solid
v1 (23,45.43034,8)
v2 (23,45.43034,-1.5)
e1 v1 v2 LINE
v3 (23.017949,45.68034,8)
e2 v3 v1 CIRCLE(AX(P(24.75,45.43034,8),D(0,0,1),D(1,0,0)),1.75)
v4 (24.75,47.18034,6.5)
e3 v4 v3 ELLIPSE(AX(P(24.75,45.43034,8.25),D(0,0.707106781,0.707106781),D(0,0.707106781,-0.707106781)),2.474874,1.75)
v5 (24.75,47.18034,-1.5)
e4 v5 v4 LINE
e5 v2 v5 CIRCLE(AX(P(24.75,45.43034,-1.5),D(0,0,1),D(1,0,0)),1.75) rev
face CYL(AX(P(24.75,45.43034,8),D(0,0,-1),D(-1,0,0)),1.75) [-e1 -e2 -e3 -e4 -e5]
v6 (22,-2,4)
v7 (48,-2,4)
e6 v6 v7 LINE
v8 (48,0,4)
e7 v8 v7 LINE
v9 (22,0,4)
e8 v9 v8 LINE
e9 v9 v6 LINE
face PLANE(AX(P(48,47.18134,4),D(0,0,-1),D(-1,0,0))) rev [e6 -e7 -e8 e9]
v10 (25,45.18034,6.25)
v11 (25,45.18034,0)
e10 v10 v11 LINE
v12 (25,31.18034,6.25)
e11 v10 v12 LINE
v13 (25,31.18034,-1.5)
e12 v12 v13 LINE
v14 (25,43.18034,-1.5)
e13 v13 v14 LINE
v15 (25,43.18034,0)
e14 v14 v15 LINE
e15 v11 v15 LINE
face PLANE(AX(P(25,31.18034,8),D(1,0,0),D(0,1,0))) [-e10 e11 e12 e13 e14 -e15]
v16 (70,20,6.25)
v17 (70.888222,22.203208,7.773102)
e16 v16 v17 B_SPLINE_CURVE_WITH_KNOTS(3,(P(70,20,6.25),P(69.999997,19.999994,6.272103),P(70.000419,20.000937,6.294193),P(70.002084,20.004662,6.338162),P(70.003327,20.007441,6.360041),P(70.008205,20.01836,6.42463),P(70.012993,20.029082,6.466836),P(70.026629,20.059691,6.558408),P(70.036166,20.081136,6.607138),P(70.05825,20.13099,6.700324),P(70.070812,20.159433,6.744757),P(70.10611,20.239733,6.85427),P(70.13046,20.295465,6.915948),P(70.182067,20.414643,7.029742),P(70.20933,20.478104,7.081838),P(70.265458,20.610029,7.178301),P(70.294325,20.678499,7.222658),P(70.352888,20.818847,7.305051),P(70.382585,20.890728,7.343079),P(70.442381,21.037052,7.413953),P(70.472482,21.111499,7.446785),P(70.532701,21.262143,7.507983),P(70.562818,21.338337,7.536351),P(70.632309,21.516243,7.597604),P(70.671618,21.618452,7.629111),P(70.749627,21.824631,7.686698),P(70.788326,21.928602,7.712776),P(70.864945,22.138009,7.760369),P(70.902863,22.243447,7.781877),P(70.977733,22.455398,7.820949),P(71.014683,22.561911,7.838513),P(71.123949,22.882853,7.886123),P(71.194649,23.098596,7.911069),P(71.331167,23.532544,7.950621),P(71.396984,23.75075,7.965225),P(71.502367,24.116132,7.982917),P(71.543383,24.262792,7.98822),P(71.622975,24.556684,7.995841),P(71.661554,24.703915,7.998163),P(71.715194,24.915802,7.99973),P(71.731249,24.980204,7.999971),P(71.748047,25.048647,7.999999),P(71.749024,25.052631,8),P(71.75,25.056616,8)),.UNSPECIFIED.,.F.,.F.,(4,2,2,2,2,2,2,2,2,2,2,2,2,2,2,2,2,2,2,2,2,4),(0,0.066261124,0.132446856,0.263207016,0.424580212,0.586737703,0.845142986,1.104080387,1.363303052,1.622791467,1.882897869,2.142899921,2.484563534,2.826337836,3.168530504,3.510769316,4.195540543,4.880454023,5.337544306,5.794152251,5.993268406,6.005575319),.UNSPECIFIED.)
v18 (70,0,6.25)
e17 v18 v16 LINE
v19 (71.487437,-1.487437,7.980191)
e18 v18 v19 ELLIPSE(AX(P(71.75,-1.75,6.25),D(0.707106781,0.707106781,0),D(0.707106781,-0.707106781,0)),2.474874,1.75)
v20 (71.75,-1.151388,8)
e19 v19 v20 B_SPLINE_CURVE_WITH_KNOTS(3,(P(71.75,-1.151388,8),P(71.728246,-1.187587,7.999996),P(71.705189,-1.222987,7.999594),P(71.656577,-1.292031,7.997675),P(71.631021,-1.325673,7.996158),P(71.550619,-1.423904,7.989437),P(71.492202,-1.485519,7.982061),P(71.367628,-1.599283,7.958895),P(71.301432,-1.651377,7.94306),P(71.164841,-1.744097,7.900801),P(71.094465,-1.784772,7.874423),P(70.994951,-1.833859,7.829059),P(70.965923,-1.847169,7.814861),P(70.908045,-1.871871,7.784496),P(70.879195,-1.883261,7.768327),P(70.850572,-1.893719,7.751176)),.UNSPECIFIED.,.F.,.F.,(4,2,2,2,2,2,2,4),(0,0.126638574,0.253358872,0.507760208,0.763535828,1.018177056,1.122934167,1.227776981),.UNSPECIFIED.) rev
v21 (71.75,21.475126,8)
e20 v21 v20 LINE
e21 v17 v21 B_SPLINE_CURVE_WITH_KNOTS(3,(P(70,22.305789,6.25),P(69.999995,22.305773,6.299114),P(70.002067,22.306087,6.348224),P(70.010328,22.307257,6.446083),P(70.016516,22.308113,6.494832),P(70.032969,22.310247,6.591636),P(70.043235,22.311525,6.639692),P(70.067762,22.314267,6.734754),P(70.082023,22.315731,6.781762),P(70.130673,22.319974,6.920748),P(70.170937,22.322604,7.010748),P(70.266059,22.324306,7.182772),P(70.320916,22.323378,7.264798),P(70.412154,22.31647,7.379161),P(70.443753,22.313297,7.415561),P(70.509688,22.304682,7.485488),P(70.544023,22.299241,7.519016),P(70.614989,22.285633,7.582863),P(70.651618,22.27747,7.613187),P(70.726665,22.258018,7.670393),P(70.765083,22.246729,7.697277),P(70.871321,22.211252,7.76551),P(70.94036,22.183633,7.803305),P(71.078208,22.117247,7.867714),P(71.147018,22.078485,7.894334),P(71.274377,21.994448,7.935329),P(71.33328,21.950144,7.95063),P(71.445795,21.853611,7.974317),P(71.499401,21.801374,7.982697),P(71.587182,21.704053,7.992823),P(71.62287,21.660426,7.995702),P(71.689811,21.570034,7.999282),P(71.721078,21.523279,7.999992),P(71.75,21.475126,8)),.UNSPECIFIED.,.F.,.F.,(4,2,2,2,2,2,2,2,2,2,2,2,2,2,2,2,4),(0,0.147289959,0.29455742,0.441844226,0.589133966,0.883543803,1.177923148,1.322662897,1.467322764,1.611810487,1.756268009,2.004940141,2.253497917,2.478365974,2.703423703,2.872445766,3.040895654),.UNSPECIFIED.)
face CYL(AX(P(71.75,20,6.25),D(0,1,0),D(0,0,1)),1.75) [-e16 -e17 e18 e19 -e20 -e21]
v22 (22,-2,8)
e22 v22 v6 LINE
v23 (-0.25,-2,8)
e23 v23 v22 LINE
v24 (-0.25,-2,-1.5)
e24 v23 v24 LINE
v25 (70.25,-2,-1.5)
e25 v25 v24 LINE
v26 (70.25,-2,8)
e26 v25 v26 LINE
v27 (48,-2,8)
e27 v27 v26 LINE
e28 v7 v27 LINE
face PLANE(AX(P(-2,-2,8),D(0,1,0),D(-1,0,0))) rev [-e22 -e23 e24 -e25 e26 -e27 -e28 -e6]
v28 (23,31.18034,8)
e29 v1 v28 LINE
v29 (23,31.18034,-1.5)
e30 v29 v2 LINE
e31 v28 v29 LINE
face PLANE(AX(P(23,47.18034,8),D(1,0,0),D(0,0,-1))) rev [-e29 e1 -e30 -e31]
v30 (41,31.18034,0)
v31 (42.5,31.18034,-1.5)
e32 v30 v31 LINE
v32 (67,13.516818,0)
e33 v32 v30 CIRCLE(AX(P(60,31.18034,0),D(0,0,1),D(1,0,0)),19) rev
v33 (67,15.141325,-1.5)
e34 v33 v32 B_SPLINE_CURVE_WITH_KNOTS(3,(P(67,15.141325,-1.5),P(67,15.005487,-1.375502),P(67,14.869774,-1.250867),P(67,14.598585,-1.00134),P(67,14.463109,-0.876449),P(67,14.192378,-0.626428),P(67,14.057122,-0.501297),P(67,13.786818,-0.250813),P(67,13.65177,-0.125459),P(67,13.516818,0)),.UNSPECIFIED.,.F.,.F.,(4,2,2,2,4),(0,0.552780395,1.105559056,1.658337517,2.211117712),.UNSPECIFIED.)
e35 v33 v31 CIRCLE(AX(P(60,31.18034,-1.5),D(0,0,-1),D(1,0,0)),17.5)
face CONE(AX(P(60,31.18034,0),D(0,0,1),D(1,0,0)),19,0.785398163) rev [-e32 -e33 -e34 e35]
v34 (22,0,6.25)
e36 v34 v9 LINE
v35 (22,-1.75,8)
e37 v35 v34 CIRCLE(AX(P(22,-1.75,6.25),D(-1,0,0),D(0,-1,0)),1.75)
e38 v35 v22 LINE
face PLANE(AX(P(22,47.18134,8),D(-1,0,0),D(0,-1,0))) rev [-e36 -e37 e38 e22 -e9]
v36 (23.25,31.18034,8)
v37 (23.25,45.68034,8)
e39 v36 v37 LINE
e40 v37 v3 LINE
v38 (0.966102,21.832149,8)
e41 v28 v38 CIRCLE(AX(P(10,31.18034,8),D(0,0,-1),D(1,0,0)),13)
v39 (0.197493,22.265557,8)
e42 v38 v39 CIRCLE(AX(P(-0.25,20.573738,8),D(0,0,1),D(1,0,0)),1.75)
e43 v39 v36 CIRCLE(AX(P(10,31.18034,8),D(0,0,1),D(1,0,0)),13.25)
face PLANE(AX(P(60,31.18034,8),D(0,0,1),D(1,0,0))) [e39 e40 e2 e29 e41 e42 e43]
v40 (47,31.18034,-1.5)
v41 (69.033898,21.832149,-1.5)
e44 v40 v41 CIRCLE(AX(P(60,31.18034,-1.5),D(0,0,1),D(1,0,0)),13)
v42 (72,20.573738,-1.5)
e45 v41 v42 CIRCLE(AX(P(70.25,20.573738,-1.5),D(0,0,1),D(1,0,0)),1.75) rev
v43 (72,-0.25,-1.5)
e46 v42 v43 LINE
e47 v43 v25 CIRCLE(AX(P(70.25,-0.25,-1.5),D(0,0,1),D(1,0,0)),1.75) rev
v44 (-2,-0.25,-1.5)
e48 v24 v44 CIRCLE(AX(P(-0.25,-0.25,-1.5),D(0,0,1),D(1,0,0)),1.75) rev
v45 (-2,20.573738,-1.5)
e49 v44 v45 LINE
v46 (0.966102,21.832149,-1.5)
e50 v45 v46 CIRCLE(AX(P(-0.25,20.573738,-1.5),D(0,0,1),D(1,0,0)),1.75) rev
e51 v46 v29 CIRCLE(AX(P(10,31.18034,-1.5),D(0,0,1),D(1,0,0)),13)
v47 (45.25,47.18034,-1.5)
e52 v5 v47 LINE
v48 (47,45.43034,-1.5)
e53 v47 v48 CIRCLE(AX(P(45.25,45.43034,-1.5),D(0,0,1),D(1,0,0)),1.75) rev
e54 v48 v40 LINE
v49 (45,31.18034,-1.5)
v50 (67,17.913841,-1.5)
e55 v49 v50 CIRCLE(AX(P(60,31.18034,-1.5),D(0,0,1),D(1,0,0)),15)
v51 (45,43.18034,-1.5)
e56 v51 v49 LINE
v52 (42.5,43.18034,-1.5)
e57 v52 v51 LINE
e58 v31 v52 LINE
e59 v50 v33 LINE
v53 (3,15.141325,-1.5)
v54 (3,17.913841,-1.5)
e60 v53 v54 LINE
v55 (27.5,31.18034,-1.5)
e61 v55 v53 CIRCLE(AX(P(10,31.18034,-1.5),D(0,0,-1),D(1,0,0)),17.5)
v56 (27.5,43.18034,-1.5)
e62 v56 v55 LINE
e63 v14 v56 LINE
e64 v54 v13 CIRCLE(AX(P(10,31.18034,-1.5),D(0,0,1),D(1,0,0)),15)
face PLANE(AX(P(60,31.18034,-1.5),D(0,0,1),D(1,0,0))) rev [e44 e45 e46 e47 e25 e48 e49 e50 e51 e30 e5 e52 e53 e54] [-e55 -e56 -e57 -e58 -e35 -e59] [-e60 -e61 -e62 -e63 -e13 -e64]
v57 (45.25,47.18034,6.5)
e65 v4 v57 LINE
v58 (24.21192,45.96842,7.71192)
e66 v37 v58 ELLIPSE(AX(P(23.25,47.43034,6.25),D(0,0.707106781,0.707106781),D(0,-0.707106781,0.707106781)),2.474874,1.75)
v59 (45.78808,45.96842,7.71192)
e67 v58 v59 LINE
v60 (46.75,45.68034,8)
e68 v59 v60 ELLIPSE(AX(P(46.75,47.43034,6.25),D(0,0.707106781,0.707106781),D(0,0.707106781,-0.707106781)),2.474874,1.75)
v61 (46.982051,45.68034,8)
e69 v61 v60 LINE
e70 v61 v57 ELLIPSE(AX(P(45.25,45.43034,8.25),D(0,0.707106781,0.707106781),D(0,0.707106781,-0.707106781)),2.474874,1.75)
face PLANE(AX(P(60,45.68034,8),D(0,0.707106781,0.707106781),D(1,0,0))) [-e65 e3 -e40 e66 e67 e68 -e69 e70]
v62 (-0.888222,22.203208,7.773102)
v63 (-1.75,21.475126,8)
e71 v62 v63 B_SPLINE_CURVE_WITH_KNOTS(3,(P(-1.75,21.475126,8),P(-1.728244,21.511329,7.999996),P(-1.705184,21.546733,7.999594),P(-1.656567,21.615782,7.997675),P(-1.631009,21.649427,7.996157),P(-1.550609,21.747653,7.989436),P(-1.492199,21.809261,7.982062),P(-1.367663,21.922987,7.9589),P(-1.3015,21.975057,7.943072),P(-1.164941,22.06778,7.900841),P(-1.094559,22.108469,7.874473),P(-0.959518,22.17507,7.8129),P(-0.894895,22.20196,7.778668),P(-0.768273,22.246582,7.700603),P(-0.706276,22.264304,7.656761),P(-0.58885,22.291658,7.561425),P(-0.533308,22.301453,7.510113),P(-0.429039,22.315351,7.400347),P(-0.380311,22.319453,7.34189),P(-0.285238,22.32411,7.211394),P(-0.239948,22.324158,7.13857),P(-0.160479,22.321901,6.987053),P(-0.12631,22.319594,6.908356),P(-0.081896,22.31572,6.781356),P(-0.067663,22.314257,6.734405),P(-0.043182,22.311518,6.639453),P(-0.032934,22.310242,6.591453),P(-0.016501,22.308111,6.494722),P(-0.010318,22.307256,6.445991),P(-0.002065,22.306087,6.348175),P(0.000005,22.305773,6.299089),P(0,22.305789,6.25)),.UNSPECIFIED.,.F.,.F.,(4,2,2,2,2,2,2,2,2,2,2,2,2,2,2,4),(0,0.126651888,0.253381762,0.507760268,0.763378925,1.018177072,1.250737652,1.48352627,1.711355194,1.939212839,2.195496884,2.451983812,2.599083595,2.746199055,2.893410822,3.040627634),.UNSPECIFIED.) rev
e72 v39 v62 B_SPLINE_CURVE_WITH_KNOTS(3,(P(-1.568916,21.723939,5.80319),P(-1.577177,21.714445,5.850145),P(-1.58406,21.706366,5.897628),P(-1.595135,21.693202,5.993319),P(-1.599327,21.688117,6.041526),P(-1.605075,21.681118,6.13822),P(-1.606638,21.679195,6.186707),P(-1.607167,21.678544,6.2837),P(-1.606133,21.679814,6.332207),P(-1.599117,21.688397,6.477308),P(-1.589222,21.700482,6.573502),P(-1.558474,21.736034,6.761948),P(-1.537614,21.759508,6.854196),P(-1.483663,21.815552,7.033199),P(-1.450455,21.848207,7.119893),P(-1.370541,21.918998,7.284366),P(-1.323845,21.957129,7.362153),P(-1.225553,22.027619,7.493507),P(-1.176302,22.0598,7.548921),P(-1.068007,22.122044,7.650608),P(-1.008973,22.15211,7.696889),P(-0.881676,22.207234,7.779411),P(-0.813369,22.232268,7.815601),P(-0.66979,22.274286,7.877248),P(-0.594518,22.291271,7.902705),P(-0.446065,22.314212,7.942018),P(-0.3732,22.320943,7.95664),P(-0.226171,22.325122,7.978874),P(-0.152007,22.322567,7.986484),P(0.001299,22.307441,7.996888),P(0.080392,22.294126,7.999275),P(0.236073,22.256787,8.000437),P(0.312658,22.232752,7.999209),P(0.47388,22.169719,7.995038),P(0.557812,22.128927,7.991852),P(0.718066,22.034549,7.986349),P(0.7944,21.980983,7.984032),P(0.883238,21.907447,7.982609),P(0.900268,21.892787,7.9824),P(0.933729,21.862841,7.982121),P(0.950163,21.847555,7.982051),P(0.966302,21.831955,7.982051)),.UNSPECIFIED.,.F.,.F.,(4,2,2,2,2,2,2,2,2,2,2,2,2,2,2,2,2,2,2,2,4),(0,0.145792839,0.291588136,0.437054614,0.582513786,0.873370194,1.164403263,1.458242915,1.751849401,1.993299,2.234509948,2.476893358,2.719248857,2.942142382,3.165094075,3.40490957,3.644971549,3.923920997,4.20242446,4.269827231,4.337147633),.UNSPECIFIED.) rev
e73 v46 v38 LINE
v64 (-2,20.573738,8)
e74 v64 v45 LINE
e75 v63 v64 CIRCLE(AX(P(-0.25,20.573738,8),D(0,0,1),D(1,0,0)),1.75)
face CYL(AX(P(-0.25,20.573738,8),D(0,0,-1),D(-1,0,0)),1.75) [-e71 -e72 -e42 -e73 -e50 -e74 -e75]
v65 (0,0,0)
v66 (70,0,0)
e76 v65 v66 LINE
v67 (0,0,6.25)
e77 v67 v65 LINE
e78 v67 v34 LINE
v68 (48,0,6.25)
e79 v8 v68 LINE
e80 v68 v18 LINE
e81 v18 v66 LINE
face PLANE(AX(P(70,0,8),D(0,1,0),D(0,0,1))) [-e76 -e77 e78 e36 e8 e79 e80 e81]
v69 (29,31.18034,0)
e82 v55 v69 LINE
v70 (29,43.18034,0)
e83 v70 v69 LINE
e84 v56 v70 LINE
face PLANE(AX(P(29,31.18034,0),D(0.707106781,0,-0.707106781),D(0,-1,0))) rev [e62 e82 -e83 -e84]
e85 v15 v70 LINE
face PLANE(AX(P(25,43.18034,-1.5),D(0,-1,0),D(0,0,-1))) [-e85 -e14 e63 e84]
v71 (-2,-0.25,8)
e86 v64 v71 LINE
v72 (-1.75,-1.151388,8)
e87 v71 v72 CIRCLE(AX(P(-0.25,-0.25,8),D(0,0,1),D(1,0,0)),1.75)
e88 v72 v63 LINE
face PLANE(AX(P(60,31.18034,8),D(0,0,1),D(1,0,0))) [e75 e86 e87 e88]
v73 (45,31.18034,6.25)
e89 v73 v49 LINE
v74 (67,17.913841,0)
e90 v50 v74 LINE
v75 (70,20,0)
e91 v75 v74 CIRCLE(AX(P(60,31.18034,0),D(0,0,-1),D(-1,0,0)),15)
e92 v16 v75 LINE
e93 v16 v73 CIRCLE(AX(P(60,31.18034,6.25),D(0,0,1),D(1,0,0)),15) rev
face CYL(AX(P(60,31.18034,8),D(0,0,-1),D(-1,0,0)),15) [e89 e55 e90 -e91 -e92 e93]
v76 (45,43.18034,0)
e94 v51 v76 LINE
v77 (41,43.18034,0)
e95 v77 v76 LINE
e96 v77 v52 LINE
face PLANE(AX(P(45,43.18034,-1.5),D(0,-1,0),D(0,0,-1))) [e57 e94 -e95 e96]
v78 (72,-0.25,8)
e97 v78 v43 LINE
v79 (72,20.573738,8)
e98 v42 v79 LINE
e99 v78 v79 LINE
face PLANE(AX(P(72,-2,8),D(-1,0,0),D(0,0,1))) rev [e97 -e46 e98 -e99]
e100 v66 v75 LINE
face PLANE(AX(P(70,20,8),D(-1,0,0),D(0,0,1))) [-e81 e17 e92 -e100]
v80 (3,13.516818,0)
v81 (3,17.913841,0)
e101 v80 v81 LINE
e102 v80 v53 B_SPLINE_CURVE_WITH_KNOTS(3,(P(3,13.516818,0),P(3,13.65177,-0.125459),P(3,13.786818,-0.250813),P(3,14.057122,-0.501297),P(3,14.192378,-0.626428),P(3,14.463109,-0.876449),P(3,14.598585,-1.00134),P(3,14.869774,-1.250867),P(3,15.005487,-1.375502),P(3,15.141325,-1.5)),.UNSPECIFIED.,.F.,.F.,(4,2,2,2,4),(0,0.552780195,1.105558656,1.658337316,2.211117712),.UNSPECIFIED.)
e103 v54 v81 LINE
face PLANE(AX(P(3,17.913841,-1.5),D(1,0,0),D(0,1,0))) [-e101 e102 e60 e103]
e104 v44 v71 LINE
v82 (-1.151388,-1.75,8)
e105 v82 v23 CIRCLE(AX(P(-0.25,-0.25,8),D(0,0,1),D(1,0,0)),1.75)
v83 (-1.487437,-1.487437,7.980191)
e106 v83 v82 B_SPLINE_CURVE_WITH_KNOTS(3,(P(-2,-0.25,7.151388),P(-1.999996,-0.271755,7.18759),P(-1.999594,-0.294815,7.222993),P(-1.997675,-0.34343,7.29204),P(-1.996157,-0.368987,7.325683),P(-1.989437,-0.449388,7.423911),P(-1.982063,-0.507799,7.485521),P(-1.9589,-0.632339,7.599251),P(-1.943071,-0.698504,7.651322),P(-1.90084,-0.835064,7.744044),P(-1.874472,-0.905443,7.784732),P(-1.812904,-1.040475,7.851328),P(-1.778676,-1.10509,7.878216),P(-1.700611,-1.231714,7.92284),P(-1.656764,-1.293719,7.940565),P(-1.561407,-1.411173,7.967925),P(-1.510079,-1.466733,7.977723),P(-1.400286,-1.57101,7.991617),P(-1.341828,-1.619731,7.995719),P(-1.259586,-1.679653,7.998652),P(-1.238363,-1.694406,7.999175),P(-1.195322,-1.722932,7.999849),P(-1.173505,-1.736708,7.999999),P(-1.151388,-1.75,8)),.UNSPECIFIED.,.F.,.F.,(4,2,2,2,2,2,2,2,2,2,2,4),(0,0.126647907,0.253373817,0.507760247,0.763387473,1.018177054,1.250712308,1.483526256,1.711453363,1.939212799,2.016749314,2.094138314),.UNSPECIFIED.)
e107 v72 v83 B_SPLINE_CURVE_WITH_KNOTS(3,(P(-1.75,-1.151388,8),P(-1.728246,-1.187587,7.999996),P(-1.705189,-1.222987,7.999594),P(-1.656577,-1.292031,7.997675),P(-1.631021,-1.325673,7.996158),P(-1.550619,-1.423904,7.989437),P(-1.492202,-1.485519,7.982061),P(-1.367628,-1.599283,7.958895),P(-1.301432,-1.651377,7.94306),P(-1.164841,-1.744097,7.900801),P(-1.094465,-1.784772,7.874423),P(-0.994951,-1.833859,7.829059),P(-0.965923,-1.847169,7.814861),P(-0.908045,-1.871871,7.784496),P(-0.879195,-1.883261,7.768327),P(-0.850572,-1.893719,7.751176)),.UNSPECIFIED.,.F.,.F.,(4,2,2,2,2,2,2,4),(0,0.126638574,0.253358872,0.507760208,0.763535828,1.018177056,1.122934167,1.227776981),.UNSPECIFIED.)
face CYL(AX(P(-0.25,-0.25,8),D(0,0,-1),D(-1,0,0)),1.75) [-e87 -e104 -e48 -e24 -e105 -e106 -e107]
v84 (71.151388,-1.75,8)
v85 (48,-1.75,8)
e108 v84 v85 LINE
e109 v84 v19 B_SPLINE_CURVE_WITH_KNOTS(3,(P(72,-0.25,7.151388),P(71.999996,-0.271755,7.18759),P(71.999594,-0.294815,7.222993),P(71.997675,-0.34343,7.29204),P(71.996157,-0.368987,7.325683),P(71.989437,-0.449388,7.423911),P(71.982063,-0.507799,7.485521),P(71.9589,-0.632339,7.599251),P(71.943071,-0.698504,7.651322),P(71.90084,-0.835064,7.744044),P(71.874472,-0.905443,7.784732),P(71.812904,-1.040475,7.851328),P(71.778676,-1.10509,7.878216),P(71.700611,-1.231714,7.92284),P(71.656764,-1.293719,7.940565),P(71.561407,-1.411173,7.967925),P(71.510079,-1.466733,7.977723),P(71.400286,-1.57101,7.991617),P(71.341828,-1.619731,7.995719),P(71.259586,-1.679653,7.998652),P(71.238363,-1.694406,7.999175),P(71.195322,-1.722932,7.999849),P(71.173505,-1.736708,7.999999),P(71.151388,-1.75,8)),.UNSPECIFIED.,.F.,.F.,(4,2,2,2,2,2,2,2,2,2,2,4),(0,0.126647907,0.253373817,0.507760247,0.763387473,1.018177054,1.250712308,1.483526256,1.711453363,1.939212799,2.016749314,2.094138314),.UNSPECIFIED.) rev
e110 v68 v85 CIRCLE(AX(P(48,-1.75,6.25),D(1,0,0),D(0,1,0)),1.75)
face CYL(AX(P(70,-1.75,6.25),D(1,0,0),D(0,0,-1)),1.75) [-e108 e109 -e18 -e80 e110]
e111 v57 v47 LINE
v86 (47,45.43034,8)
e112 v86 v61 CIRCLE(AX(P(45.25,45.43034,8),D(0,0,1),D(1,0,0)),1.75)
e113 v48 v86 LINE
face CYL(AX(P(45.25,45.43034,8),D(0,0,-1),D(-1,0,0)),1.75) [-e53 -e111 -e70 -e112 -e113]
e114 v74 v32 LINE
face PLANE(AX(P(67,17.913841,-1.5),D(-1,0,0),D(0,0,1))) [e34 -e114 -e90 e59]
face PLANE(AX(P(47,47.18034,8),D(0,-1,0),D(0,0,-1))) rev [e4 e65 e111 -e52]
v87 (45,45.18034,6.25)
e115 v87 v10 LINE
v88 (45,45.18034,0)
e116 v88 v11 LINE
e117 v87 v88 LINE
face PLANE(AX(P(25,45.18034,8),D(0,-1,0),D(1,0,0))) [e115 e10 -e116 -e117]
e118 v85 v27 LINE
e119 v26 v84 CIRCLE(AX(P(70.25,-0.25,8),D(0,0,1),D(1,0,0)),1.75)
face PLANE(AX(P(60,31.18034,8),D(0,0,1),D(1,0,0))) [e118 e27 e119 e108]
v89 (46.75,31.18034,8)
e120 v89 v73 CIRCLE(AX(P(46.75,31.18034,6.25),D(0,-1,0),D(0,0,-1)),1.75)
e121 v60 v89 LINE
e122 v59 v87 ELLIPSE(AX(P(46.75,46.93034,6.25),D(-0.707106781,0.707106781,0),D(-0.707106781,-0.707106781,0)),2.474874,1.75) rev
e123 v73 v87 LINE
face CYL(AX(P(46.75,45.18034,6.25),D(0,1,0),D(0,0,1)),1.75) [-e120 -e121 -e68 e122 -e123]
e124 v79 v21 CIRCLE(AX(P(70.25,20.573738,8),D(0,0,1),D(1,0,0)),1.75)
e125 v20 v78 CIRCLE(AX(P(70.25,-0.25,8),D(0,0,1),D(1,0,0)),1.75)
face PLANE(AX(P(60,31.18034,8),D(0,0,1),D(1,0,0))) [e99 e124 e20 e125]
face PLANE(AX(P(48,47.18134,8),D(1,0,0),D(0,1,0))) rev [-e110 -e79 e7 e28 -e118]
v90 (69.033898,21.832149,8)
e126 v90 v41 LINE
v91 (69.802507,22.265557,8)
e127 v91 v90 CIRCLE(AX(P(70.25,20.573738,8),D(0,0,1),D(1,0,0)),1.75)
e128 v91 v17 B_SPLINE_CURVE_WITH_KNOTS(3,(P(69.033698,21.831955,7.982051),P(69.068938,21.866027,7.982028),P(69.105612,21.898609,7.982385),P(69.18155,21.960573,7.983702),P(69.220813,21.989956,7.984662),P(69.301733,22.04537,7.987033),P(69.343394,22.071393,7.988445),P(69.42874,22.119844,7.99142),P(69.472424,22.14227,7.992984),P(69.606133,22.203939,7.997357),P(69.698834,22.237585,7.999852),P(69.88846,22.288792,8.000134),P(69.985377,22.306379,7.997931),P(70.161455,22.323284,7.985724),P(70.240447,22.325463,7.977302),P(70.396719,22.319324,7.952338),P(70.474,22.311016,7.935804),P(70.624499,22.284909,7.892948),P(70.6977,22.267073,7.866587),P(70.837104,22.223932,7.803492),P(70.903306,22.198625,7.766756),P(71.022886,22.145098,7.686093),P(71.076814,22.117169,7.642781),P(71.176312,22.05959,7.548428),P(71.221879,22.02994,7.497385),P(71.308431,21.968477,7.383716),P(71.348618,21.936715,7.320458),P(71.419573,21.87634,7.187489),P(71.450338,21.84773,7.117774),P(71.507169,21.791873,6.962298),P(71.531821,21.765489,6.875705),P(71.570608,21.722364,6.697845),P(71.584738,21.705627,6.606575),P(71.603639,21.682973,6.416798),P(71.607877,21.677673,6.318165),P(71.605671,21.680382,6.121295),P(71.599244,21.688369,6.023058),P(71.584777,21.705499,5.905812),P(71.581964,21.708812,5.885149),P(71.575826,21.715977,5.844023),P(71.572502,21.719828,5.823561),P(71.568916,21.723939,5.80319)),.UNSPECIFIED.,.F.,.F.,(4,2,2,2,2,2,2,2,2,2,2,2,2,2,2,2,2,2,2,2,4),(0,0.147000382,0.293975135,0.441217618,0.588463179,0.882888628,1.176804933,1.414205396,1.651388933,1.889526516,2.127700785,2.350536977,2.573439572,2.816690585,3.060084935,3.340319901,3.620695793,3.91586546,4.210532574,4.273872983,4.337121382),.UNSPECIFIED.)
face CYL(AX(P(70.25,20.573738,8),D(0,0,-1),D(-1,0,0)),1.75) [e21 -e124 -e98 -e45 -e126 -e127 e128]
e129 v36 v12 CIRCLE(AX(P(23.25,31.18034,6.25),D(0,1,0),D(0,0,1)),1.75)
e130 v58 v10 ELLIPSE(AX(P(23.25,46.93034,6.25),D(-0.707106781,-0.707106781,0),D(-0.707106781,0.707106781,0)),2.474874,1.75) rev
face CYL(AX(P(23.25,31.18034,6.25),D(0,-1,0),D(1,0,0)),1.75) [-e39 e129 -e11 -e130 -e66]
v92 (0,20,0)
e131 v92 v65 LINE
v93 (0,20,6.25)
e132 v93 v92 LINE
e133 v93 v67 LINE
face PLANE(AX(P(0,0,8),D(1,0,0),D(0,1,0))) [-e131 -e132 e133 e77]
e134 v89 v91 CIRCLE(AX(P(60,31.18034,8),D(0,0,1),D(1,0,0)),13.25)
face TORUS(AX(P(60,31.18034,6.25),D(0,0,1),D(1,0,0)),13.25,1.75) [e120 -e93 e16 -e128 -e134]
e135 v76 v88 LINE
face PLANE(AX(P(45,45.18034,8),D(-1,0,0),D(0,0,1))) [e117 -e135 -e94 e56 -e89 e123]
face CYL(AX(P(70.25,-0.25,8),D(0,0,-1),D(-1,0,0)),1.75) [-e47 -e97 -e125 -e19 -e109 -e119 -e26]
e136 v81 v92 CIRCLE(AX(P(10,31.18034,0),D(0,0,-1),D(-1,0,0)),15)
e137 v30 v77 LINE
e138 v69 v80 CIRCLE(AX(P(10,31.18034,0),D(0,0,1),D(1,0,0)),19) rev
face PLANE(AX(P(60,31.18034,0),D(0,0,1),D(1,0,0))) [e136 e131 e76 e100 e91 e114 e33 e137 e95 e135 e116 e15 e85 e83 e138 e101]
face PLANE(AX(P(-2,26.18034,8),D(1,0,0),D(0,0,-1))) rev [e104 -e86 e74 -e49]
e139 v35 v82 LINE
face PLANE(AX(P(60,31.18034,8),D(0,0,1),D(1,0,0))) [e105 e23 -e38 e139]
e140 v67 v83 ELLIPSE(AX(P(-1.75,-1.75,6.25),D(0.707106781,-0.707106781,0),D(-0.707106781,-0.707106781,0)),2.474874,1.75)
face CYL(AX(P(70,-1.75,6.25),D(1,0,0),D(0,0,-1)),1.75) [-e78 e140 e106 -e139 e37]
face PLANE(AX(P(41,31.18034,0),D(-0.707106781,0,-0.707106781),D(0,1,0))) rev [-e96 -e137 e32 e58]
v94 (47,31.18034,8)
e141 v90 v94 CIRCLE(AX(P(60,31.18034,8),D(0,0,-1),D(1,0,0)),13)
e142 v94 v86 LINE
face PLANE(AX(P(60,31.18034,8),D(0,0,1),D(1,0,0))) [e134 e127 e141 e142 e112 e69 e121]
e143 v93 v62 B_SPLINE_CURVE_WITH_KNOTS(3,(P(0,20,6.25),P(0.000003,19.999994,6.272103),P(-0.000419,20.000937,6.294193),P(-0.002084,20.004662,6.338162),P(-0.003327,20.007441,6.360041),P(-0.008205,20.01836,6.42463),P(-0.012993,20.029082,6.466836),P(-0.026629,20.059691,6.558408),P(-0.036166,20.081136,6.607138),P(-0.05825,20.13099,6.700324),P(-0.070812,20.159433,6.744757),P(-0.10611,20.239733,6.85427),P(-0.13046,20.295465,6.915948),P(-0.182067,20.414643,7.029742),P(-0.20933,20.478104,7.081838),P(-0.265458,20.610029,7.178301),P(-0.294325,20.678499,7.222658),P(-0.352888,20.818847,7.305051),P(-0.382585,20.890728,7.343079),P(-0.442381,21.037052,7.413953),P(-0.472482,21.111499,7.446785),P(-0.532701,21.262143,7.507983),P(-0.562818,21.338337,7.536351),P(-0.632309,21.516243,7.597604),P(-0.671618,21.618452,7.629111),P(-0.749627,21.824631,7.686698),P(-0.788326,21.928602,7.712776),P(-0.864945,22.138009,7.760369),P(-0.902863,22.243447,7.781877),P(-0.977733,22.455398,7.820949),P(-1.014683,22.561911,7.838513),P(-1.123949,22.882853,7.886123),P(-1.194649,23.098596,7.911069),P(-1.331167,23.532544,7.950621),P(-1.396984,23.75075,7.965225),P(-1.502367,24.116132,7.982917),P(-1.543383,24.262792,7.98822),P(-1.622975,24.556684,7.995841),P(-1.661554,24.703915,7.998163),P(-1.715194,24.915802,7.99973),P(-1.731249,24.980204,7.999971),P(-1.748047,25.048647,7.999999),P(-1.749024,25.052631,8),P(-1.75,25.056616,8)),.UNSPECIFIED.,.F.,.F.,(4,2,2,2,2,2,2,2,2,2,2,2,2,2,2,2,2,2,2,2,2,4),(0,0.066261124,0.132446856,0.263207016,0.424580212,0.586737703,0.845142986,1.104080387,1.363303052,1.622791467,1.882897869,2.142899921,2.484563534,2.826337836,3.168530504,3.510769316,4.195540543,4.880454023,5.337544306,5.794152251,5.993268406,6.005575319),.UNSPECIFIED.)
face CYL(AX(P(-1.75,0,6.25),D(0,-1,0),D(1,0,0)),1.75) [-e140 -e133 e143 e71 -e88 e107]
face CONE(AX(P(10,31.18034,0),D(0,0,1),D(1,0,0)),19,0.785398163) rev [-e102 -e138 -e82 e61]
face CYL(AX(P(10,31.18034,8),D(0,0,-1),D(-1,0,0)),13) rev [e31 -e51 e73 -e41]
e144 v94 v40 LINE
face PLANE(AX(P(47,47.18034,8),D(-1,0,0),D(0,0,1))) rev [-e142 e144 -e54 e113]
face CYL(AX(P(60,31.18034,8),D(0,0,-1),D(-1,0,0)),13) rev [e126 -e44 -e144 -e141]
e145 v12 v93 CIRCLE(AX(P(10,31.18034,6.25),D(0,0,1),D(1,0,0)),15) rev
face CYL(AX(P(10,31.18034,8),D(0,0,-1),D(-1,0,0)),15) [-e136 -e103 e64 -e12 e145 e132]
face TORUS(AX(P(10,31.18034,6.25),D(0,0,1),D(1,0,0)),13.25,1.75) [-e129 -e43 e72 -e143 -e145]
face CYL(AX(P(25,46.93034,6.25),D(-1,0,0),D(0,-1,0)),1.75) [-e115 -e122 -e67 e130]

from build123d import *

# Parameters (mm, degrees)
BOSS_EXTRUDE1_DEPTH = 8
BOSS_EXTRUDE2_START = 1.5
BOSS_EXTRUDE2_DEPTH = 1.5
CHAMFER1_SIZE       = 1.5
CHAMFER2_SIZE       = 1.5
FILLET1_R           = 1.75
CUT_EXTRUDE1_REACH  = 89.56
SKETCH3_W           = 26
SKETCH3_H           = 4


# Some blends are built 0.0001 mm under size
with BuildPart() as part:
    # Sketch1 → Boss-Extrude1 (new body)
    with BuildSketch(Plane(origin=(0, 0, 0), x_dir=(-1, 0, 0), z_dir=(0, 0, 1))):
        with BuildLine():
            Line((2, 2), (-72, 2))
            Line((-72, 2), (-72, -26.180339887))
            ThreePointArc((-72, -26.180339887), (-57.450490243, -18.432791104), (-47, -31.180339887))
            Line((-47, -31.180339887), (-47, -47.180339887))
            Line((-47, -47.180339887), (-23, -47.180339887))
            Line((-23, -47.180339887), (-23, -31.180339887))
            ThreePointArc((-23, -31.180339887), (-12.549509757, -18.432791104), (2, -26.180339887))
            Line((2, -26.180339887), (2, 2))
        make_face()
        with BuildLine():
            Line((-70, 0), (0, 0))
            Line((0, 0), (0, -20))
            ThreePointArc((0, -20), (-16.123724357, -17.48727595), (-25, -31.180339887))
            Line((-25, -31.180339887), (-25, -45.180339887))
            Line((-25, -45.180339887), (-45, -45.180339887))
            Line((-45, -45.180339887), (-45, -31.180339887))
            ThreePointArc((-45, -31.180339887), (-53.876275643, -17.48727595), (-70, -20))
            Line((-70, -20), (-70, 0))
        make_face(mode=Mode.SUBTRACT)
    extrude(amount=BOSS_EXTRUDE1_DEPTH)

    # Sketch2 → Boss-Extrude2 (add)
    with BuildSketch(Plane(origin=(0, 0, 0), x_dir=(-1, 0, 0), z_dir=(0, 0, -1)).offset(BOSS_EXTRUDE2_START)):
        with BuildLine():
            Line((2, -2), (-72, -2))
            Line((-72, -2), (-72, 26.180339887))
            ThreePointArc((-72, 26.180339887), (-57.450490243, 18.432791104), (-47, 31.180339887))
            Line((-47, 31.180339887), (-47, 47.180339887))
            Line((-47, 47.180339887), (-23, 47.180339887))
            Line((-23, 47.180339887), (-23, 31.180339887))
            ThreePointArc((-23, 31.180339887), (-12.549509757, 18.432791104), (2, 26.180339887))
            Line((2, 26.180339887), (2, -2))
        make_face()
        with BuildLine():
            Line((-3, 17.913840726), (-3, 15.141324955))
            ThreePointArc((-3, 15.141324955), (-19.585144756, 16.538789423), (-27.5, 31.180339887))
            Line((-27.5, 31.180339887), (-27.5, 43.180339887))
            Line((-27.5, 43.180339887), (-25, 43.180339887))
            Line((-25, 43.180339887), (-25, 31.180339887))
            ThreePointArc((-25, 31.180339887), (-17.745966692, 18.335107309), (-3, 17.913840726))
        make_face(mode=Mode.SUBTRACT)
        with BuildLine():
            Line((-67, 17.913840726), (-67, 15.141324955))
            ThreePointArc((-67, 15.141324955), (-50.414855244, 16.538789423), (-42.5, 31.180339887))
            Line((-42.5, 31.180339887), (-42.5, 43.180339887))
            Line((-42.5, 43.180339887), (-45, 43.180339887))
            Line((-45, 43.180339887), (-45, 31.180339887))
            ThreePointArc((-45, 31.180339887), (-52.254033308, 18.335107309), (-67, 17.913840726))
        make_face(mode=Mode.SUBTRACT)
    extrude(amount=-BOSS_EXTRUDE2_DEPTH)

    # Chamfer1
    chamfer1_edges = [part.edges().sort_by_distance(p)[0] for p in [
        (42.5, 37.180339887, 0),
        (50.414855244, 16.538789423, 0),
        (27.5, 37.180339887, 0),
        (19.585144756, 16.538789423, 0),
    ]]
    chamfer(chamfer1_edges, length=CHAMFER1_SIZE - 0.0001)  # a hair under: the kernel refuses the full size

    # Chamfer2
    chamfer2_edges = [part.edges().sort_by_distance(p)[0] for p in [
        (35, 47.180339887, 8),
    ]]
    chamfer(chamfer2_edges, length=CHAMFER2_SIZE)

    # Fillet1
    # the kernel refuses this fillet: 1.75 mm, written as the material it takes off along each edge
    with BuildSketch(Plane(origin=(10, 31.180339887, 8), x_dir=(-0.8529681786661586, -0.5219629164825181, 0), z_dir=(-0.5219629164825181, 0.8529681786661586, 0))) as fillet1_piece_1_section:
        with BuildLine():
            CenterArc((15 - FILLET1_R, -FILLET1_R), FILLET1_R, 0, 90)
            Line((15, -FILLET1_R), (15 + FILLET1_R * 0.02, -FILLET1_R))
            Line((15 + FILLET1_R * 0.02, -FILLET1_R), (15 + FILLET1_R * 0.02, FILLET1_R * 0.02))
            Line((15 + FILLET1_R * 0.02, FILLET1_R * 0.02), (15 - FILLET1_R, FILLET1_R * 0.02))
            Line((15 - FILLET1_R, FILLET1_R * 0.02), (15 - FILLET1_R, 0))
        make_face()
    fillet1_piece_1 = revolve(axis=Axis((10, 31.180339887, 8), (0, 0, 1)), revolution_arc=148.535987608, mode=Mode.PRIVATE)
    fillet1_piece_1 = split(fillet1_piece_1, bisect_by=Plane(origin=(0, 17.590580618, 7.50852365), z_dir=(1, 0, 0)), keep=Keep.TOP, mode=Mode.PRIVATE)
    add(fillet1_piece_1, mode=Mode.SUBTRACT)
    with BuildSketch(Plane(origin=(0, 0, 8), x_dir=(-1, 0, 0), z_dir=(0, 1, 0))) as fillet1_piece_2_section:
        with BuildLine():
            CenterArc((FILLET1_R, -FILLET1_R), FILLET1_R, 90, 90)
            Line((0, -FILLET1_R), (-FILLET1_R * 0.02, -FILLET1_R))
            Line((-FILLET1_R * 0.02, -FILLET1_R), (-FILLET1_R * 0.02, FILLET1_R * 0.02))
            Line((-FILLET1_R * 0.02, FILLET1_R * 0.02), (FILLET1_R, FILLET1_R * 0.02))
            Line((FILLET1_R, FILLET1_R * 0.02), (FILLET1_R, 0))
        make_face()
    fillet1_piece_2 = extrude(amount=24.375, mode=Mode.PRIVATE)
    fillet1_piece_2 = fillet1_piece_2 - Plane(origin=(10, 31.180339887, 7.607877329), x_dir=(-0.6666666666666653, -0.7453559924999311, 0), z_dir=(0, 0, -1)) * Cylinder(15, 56, mode=Mode.PRIVATE)
    add(fillet1_piece_2, mode=Mode.SUBTRACT)
    with BuildSketch(Plane(origin=(25, 31.180339887, 8), x_dir=(-1, 0, 0), z_dir=(0, 1, 0)), Plane(origin=(45, 45.180339887, 8), x_dir=(1, 0, 0), z_dir=(0, -1, 0))) as fillet1_piece_3:
        with BuildLine():
            CenterArc((FILLET1_R, -FILLET1_R), FILLET1_R, 90, 90)
            Line((0, -FILLET1_R), (-FILLET1_R * 0.02, -FILLET1_R))
            Line((-FILLET1_R * 0.02, -FILLET1_R), (-FILLET1_R * 0.02, FILLET1_R * 0.02))
            Line((-FILLET1_R * 0.02, FILLET1_R * 0.02), (FILLET1_R, FILLET1_R * 0.02))
            Line((FILLET1_R, FILLET1_R * 0.02), (FILLET1_R, 0))
        make_face()
    extrude(amount=14, mode=Mode.SUBTRACT)
    with BuildSketch(Plane(origin=(70, 0, 8), x_dir=(0, -1, 0), z_dir=(-1, 0, 0))) as fillet1_piece_4:
        with BuildLine():
            CenterArc((FILLET1_R, -FILLET1_R), FILLET1_R, 90, 90)
            Line((0, -FILLET1_R), (-FILLET1_R * 0.02, -FILLET1_R))
            Line((-FILLET1_R * 0.02, -FILLET1_R), (-FILLET1_R * 0.02, FILLET1_R * 0.02))
            Line((-FILLET1_R * 0.02, FILLET1_R * 0.02), (FILLET1_R, FILLET1_R * 0.02))
            Line((FILLET1_R, FILLET1_R * 0.02), (FILLET1_R, 0))
        make_face()
    extrude(amount=70, mode=Mode.SUBTRACT)
    with BuildSketch(Plane(origin=(70, 24.375, 8), x_dir=(1, 0, 0), z_dir=(0, -1, 0))) as fillet1_piece_5_section:
        with BuildLine():
            CenterArc((FILLET1_R, -FILLET1_R), FILLET1_R, 90, 90)
            Line((0, -FILLET1_R), (-FILLET1_R * 0.02, -FILLET1_R))
            Line((-FILLET1_R * 0.02, -FILLET1_R), (-FILLET1_R * 0.02, FILLET1_R * 0.02))
            Line((-FILLET1_R * 0.02, FILLET1_R * 0.02), (FILLET1_R, FILLET1_R * 0.02))
            Line((FILLET1_R, FILLET1_R * 0.02), (FILLET1_R, 0))
        make_face()
    fillet1_piece_5 = extrude(amount=24.375, mode=Mode.PRIVATE)
    fillet1_piece_5 = fillet1_piece_5 - Plane(origin=(60, 31.180339887, 7.607877375), x_dir=(-1, 0, 0), z_dir=(0, 0, -1)) * Cylinder(15, 56, mode=Mode.PRIVATE)
    add(fillet1_piece_5, mode=Mode.SUBTRACT)
    with BuildSketch(Plane(origin=(60, 31.180339887, 8), x_dir=(-1, 0, 0), z_dir=(0, 1, 0))) as fillet1_piece_6_section:
        with BuildLine():
            CenterArc((15 - FILLET1_R, -FILLET1_R), FILLET1_R, 0, 90)
            Line((15, -FILLET1_R), (15 + FILLET1_R * 0.02, -FILLET1_R))
            Line((15 + FILLET1_R * 0.02, -FILLET1_R), (15 + FILLET1_R * 0.02, FILLET1_R * 0.02))
            Line((15 + FILLET1_R * 0.02, FILLET1_R * 0.02), (15 - FILLET1_R, FILLET1_R * 0.02))
            Line((15 - FILLET1_R, FILLET1_R * 0.02), (15 - FILLET1_R, 0))
        make_face()
    fillet1_piece_6 = revolve(axis=Axis((60, 31.180339887, 8), (0, 0, 1)), revolution_arc=148.535987608, mode=Mode.PRIVATE)
    fillet1_piece_6 = split(fillet1_piece_6, bisect_by=Plane(origin=(70, 17.590580683, 7.508523582), z_dir=(-1, 0, 0)), keep=Keep.TOP, mode=Mode.PRIVATE)
    add(fillet1_piece_6, mode=Mode.SUBTRACT)
    with BuildSketch(Plane(origin=(25, 45.180339887, 8), x_dir=(0, 1, 0), z_dir=(1, 0, 0))) as fillet1_piece_7:
        with BuildLine():
            CenterArc((FILLET1_R, -FILLET1_R), FILLET1_R, 90, 90)
            Line((0, -FILLET1_R), (-FILLET1_R * 0.02, -FILLET1_R))
            Line((-FILLET1_R * 0.02, -FILLET1_R), (-FILLET1_R * 0.02, FILLET1_R * 0.02))
            Line((-FILLET1_R * 0.02, FILLET1_R * 0.02), (FILLET1_R, FILLET1_R * 0.02))
            Line((FILLET1_R, FILLET1_R * 0.02), (FILLET1_R, 0))
        make_face()
    extrude(amount=20, mode=Mode.SUBTRACT)
    with BuildSketch(Plane(origin=(72, 26.180339887, -1.5), x_dir=(-0.5635217270596511, -0.8261012426644256, 0), z_dir=(0, 0, 1)), Plane(origin=(-2, 26.180339887, 8), x_dir=(0.5635217270596506, -0.8261012426644259, 0), z_dir=(0, 0, -1))) as fillet1_piece_8:
        with BuildLine():
            CenterArc((5.617783669, 1.713764708), FILLET1_R, 124.299700248, 134.020464453)
            Line((4.631620646, 3.159441883), (4.611897386, 3.188355426))
            Line((4.611897386, 3.188355426), (-0.01972326, 0.028913543))
            Line((-0.01972326, 0.028913543), (0.007085493, -0.034275294))
            ThreePointArc((0.007085493, -0.034275294), (2.631754511, 0.234176453), (5.25642353, -0.034275294))
            Line((5.25642353, -0.034275294), (5.263509023, 0))
        make_face()
    extrude(amount=9.5, mode=Mode.SUBTRACT)
    with BuildSketch(Plane(origin=(72, -2, -1.5), x_dir=(0, 1, 0), z_dir=(0, 0, 1)), Plane(origin=(-2, -2, -1.5), x_dir=(1, 0, 0), z_dir=(0, 0, 1))) as fillet1_piece_9:
        with BuildLine():
            CenterArc((FILLET1_R, FILLET1_R), FILLET1_R, 180, 90)
            Line((0, FILLET1_R), (-FILLET1_R * 0.02, FILLET1_R))
            Line((-FILLET1_R * 0.02, FILLET1_R), (-FILLET1_R * 0.02, -FILLET1_R * 0.02))
            Line((-FILLET1_R * 0.02, -FILLET1_R * 0.02), (FILLET1_R, -FILLET1_R * 0.02))
            Line((FILLET1_R, -FILLET1_R * 0.02), (FILLET1_R, 0))
        make_face()
    extrude(amount=9.5, mode=Mode.SUBTRACT)
    with BuildSketch(Plane(origin=(47, 47.180339887, -1.5), x_dir=(0, -1, 0), z_dir=(0, 0, 1))) as fillet1_piece_10_section:
        with BuildLine():
            CenterArc((FILLET1_R, -FILLET1_R), FILLET1_R, 90, 90)
            Line((0, -FILLET1_R), (-FILLET1_R * 0.02, -FILLET1_R))
            Line((-FILLET1_R * 0.02, -FILLET1_R), (-FILLET1_R * 0.02, FILLET1_R * 0.02))
            Line((-FILLET1_R * 0.02, FILLET1_R * 0.02), (FILLET1_R, FILLET1_R * 0.02))
            Line((FILLET1_R, FILLET1_R * 0.02), (FILLET1_R, 0))
        make_face()
    fillet1_piece_10 = extrude(amount=12.375, mode=Mode.PRIVATE)
    fillet1_piece_10 = split(fillet1_piece_10, bisect_by=Plane(origin=(46.61382335, 48.870482081, 4.809857807), z_dir=(0, -0.7071067811865476, -0.7071067811865476)), keep=Keep.TOP, mode=Mode.PRIVATE)
    add(fillet1_piece_10, mode=Mode.SUBTRACT)
    with BuildSketch(Plane(origin=(23, 47.180339887, 10.875), x_dir=(0, -1, 0), z_dir=(0, 0, -1))) as fillet1_piece_11_section:
        with BuildLine():
            CenterArc((FILLET1_R, -FILLET1_R), FILLET1_R, 90, 90)
            Line((0, -FILLET1_R), (-FILLET1_R * 0.02, -FILLET1_R))
            Line((-FILLET1_R * 0.02, -FILLET1_R), (-FILLET1_R * 0.02, FILLET1_R * 0.02))
            Line((-FILLET1_R * 0.02, FILLET1_R * 0.02), (FILLET1_R, FILLET1_R * 0.02))
            Line((FILLET1_R, FILLET1_R * 0.02), (FILLET1_R, 0))
        make_face()
    fillet1_piece_11 = extrude(amount=12.375, mode=Mode.PRIVATE)
    fillet1_piece_11 = split(fillet1_piece_11, bisect_by=Plane(origin=(23.38617665, 48.870482081, 4.809857807), z_dir=(0, -0.7071067811865476, -0.7071067811865476)), keep=Keep.TOP, mode=Mode.PRIVATE)
    add(fillet1_piece_11, mode=Mode.SUBTRACT)
    with BuildSketch(Plane(origin=(0, 0, 8), x_dir=(-1, 0, 0), z_dir=(0, 1, 0))) as fillet1_piece_12a_section:
        with BuildLine():
            CenterArc((FILLET1_R, -FILLET1_R), FILLET1_R, 90, 90)
            Line((0, -FILLET1_R), (-FILLET1_R * 0.02, -FILLET1_R))
            Line((-FILLET1_R * 0.02, -FILLET1_R), (-FILLET1_R * 0.02, FILLET1_R * 0.02))
            Line((-FILLET1_R * 0.02, FILLET1_R * 0.02), (FILLET1_R, FILLET1_R * 0.02))
            Line((FILLET1_R, FILLET1_R * 0.02), (FILLET1_R, 0))
        make_face()
    fillet1_piece_12a = extrude(amount=24.375, mode=Mode.PRIVATE)
    fillet1_piece_12a = fillet1_piece_12a & Plane(origin=(10, 31.180339887, 7.583047858), x_dir=(-0.6666666666666653, -0.7453559924999311, 0), z_dir=(0, 0, -1)) * Cylinder(15, 56, mode=Mode.PRIVATE)
    with BuildSketch(Plane(origin=(10, 31.180339887, 8), x_dir=(-0.8529681786661586, -0.5219629164825181, 0), z_dir=(-0.5219629164825181, 0.8529681786661586, 0))) as fillet1_piece_12b_section:
        with BuildLine():
            CenterArc((15 - FILLET1_R, -FILLET1_R), FILLET1_R, 0, 90)
            Line((15, -FILLET1_R), (15 + FILLET1_R * 0.02, -FILLET1_R))
            Line((15 + FILLET1_R * 0.02, -FILLET1_R), (15 + FILLET1_R * 0.02, FILLET1_R * 0.02))
            Line((15 + FILLET1_R * 0.02, FILLET1_R * 0.02), (15 - FILLET1_R, FILLET1_R * 0.02))
            Line((15 - FILLET1_R, FILLET1_R * 0.02), (15 - FILLET1_R, 0))
        make_face()
    fillet1_piece_12b = revolve(axis=Axis((10, 31.180339887, 8), (0, 0, 1)), revolution_arc=148.535987608, mode=Mode.PRIVATE)
    fillet1_piece_12b = split(fillet1_piece_12b, bisect_by=Plane(origin=(0, 21.951360375, 7.57760015), z_dir=(-1, 0, 0)), keep=Keep.TOP, mode=Mode.PRIVATE)
    fillet1_piece_12 = fillet1_piece_12a & fillet1_piece_12b
    add(fillet1_piece_12, mode=Mode.SUBTRACT)
    with BuildSketch(Plane(origin=(70, 0, 8), x_dir=(0, -1, 0), z_dir=(-1, 0, 0))) as fillet1_piece_13a_section:
        with BuildLine():
            CenterArc((FILLET1_R, -FILLET1_R), FILLET1_R, 90, 90)
            Line((0, -FILLET1_R), (-FILLET1_R * 0.02, -FILLET1_R))
            Line((-FILLET1_R * 0.02, -FILLET1_R), (-FILLET1_R * 0.02, FILLET1_R * 0.02))
            Line((-FILLET1_R * 0.02, FILLET1_R * 0.02), (FILLET1_R, FILLET1_R * 0.02))
            Line((FILLET1_R, FILLET1_R * 0.02), (FILLET1_R, 0))
        make_face()
    fillet1_piece_13a = extrude(amount=74.375, mode=Mode.PRIVATE)
    fillet1_piece_13a = split(fillet1_piece_13a, bisect_by=Plane(origin=(0, -0.39619145, 7.60380855), z_dir=(-1, 0, 0)), keep=Keep.TOP, mode=Mode.PRIVATE)
    with BuildSketch(Plane(origin=(0, -4.375, 8), x_dir=(-1, 0, 0), z_dir=(0, 1, 0))) as fillet1_piece_13b_section:
        with BuildLine():
            CenterArc((FILLET1_R, -FILLET1_R), FILLET1_R, 90, 90)
            Line((0, -FILLET1_R), (-FILLET1_R * 0.02, -FILLET1_R))
            Line((-FILLET1_R * 0.02, -FILLET1_R), (-FILLET1_R * 0.02, FILLET1_R * 0.02))
            Line((-FILLET1_R * 0.02, FILLET1_R * 0.02), (FILLET1_R, FILLET1_R * 0.02))
            Line((FILLET1_R, FILLET1_R * 0.02), (FILLET1_R, 0))
        make_face()
    fillet1_piece_13b = extrude(amount=28.75, mode=Mode.PRIVATE)
    fillet1_piece_13b = split(fillet1_piece_13b, bisect_by=Plane(origin=(-0.39619145, 0, 7.60380855), z_dir=(0, -1, 0)), keep=Keep.TOP, mode=Mode.PRIVATE)
    fillet1_piece_13 = fillet1_piece_13a & fillet1_piece_13b
    add(fillet1_piece_13, mode=Mode.SUBTRACT)
    with BuildSketch(Plane(origin=(25, 31.180339887, 8), x_dir=(-1, 0, 0), z_dir=(0, 1, 0))) as fillet1_piece_14a_section:
        with BuildLine():
            CenterArc((FILLET1_R, -FILLET1_R), FILLET1_R, 90, 90)
            Line((0, -FILLET1_R), (-FILLET1_R * 0.02, -FILLET1_R))
            Line((-FILLET1_R * 0.02, -FILLET1_R), (-FILLET1_R * 0.02, FILLET1_R * 0.02))
            Line((-FILLET1_R * 0.02, FILLET1_R * 0.02), (FILLET1_R, FILLET1_R * 0.02))
            Line((FILLET1_R, FILLET1_R * 0.02), (FILLET1_R, 0))
        make_face()
    fillet1_piece_14a = extrude(amount=18.375, mode=Mode.PRIVATE)
    fillet1_piece_14a = split(fillet1_piece_14a, bisect_by=Plane(origin=(24.60380855, 45.180339887, 7.60380855), z_dir=(0, 1, 0)), keep=Keep.TOP, mode=Mode.PRIVATE)
    with BuildSketch(Plane(origin=(20.625, 45.180339887, 8), x_dir=(0, 1, 0), z_dir=(1, 0, 0))) as fillet1_piece_14b_section:
        with BuildLine():
            CenterArc((FILLET1_R, -FILLET1_R), FILLET1_R, 90, 90)
            Line((0, -FILLET1_R), (-FILLET1_R * 0.02, -FILLET1_R))
            Line((-FILLET1_R * 0.02, -FILLET1_R), (-FILLET1_R * 0.02, FILLET1_R * 0.02))
            Line((-FILLET1_R * 0.02, FILLET1_R * 0.02), (FILLET1_R, FILLET1_R * 0.02))
            Line((FILLET1_R, FILLET1_R * 0.02), (FILLET1_R, 0))
        make_face()
    fillet1_piece_14b = extrude(amount=24.375, mode=Mode.PRIVATE)
    fillet1_piece_14b = split(fillet1_piece_14b, bisect_by=Plane(origin=(25, 45.576531337, 7.60380855), z_dir=(-1, 0, 0)), keep=Keep.TOP, mode=Mode.PRIVATE)
    fillet1_piece_14 = fillet1_piece_14a & fillet1_piece_14b
    add(fillet1_piece_14, mode=Mode.SUBTRACT)
    with BuildSketch(Plane(origin=(70, 24.375, 8), x_dir=(1, 0, 0), z_dir=(0, -1, 0))) as fillet1_piece_15a_section:
        with BuildLine():
            CenterArc((FILLET1_R, -FILLET1_R), FILLET1_R, 90, 90)
            Line((0, -FILLET1_R), (-FILLET1_R * 0.02, -FILLET1_R))
            Line((-FILLET1_R * 0.02, -FILLET1_R), (-FILLET1_R * 0.02, FILLET1_R * 0.02))
            Line((-FILLET1_R * 0.02, FILLET1_R * 0.02), (FILLET1_R, FILLET1_R * 0.02))
            Line((FILLET1_R, FILLET1_R * 0.02), (FILLET1_R, 0))
        make_face()
    fillet1_piece_15a = extrude(amount=28.75, mode=Mode.PRIVATE)
    fillet1_piece_15a = split(fillet1_piece_15a, bisect_by=Plane(origin=(70.39619145, 0, 7.60380855), z_dir=(0, -1, 0)), keep=Keep.TOP, mode=Mode.PRIVATE)
    with BuildSketch(Plane(origin=(74.375, 0, 8), x_dir=(0, -1, 0), z_dir=(-1, 0, 0))) as fillet1_piece_15b_section:
        with BuildLine():
            CenterArc((FILLET1_R, -FILLET1_R), FILLET1_R, 90, 90)
            Line((0, -FILLET1_R), (-FILLET1_R * 0.02, -FILLET1_R))
            Line((-FILLET1_R * 0.02, -FILLET1_R), (-FILLET1_R * 0.02, FILLET1_R * 0.02))
            Line((-FILLET1_R * 0.02, FILLET1_R * 0.02), (FILLET1_R, FILLET1_R * 0.02))
            Line((FILLET1_R, FILLET1_R * 0.02), (FILLET1_R, 0))
        make_face()
    fillet1_piece_15b = extrude(amount=74.375, mode=Mode.PRIVATE)
    fillet1_piece_15b = split(fillet1_piece_15b, bisect_by=Plane(origin=(70, -0.39619145, 7.60380855), z_dir=(1, 0, 0)), keep=Keep.TOP, mode=Mode.PRIVATE)
    fillet1_piece_15 = fillet1_piece_15a & fillet1_piece_15b
    add(fillet1_piece_15, mode=Mode.SUBTRACT)
    with BuildSketch(Plane(origin=(70, 24.375, 8), x_dir=(1, 0, 0), z_dir=(0, -1, 0))) as fillet1_piece_16a_section:
        with BuildLine():
            CenterArc((FILLET1_R, -FILLET1_R), FILLET1_R, 90, 90)
            Line((0, -FILLET1_R), (-FILLET1_R * 0.02, -FILLET1_R))
            Line((-FILLET1_R * 0.02, -FILLET1_R), (-FILLET1_R * 0.02, FILLET1_R * 0.02))
            Line((-FILLET1_R * 0.02, FILLET1_R * 0.02), (FILLET1_R, FILLET1_R * 0.02))
            Line((FILLET1_R, FILLET1_R * 0.02), (FILLET1_R, 0))
        make_face()
    fillet1_piece_16a = extrude(amount=24.375, mode=Mode.PRIVATE)
    fillet1_piece_16a = fillet1_piece_16a & Plane(origin=(60, 31.180339887, 7.583047884), x_dir=(-1, 0, 0), z_dir=(0, 0, -1)) * Cylinder(15, 56, mode=Mode.PRIVATE)
    with BuildSketch(Plane(origin=(60, 31.180339887, 8), x_dir=(-1, 0, 0), z_dir=(0, 1, 0))) as fillet1_piece_16b_section:
        with BuildLine():
            CenterArc((15 - FILLET1_R, -FILLET1_R), FILLET1_R, 0, 90)
            Line((15, -FILLET1_R), (15 + FILLET1_R * 0.02, -FILLET1_R))
            Line((15 + FILLET1_R * 0.02, -FILLET1_R), (15 + FILLET1_R * 0.02, FILLET1_R * 0.02))
            Line((15 + FILLET1_R * 0.02, FILLET1_R * 0.02), (15 - FILLET1_R, FILLET1_R * 0.02))
            Line((15 - FILLET1_R, FILLET1_R * 0.02), (15 - FILLET1_R, 0))
        make_face()
    fillet1_piece_16b = revolve(axis=Axis((60, 31.180339887, 8), (0, 0, 1)), revolution_arc=148.535987608, mode=Mode.PRIVATE)
    fillet1_piece_16b = split(fillet1_piece_16b, bisect_by=Plane(origin=(70, 21.951360527, 7.577600104), z_dir=(1, 0, 0)), keep=Keep.TOP, mode=Mode.PRIVATE)
    fillet1_piece_16 = fillet1_piece_16a & fillet1_piece_16b
    add(fillet1_piece_16, mode=Mode.SUBTRACT)
    with BuildSketch(Plane(origin=(25, 45.180339887, 8), x_dir=(0, 1, 0), z_dir=(1, 0, 0))) as fillet1_piece_17a_section:
        with BuildLine():
            CenterArc((FILLET1_R, -FILLET1_R), FILLET1_R, 90, 90)
            Line((0, -FILLET1_R), (-FILLET1_R * 0.02, -FILLET1_R))
            Line((-FILLET1_R * 0.02, -FILLET1_R), (-FILLET1_R * 0.02, FILLET1_R * 0.02))
            Line((-FILLET1_R * 0.02, FILLET1_R * 0.02), (FILLET1_R, FILLET1_R * 0.02))
            Line((FILLET1_R, FILLET1_R * 0.02), (FILLET1_R, 0))
        make_face()
    fillet1_piece_17a = extrude(amount=24.375, mode=Mode.PRIVATE)
    fillet1_piece_17a = split(fillet1_piece_17a, bisect_by=Plane(origin=(45, 45.576531337, 7.60380855), z_dir=(1, 0, 0)), keep=Keep.TOP, mode=Mode.PRIVATE)
    with BuildSketch(Plane(origin=(45, 49.555339887, 8), x_dir=(1, 0, 0), z_dir=(0, -1, 0))) as fillet1_piece_17b_section:
        with BuildLine():
            CenterArc((FILLET1_R, -FILLET1_R), FILLET1_R, 90, 90)
            Line((0, -FILLET1_R), (-FILLET1_R * 0.02, -FILLET1_R))
            Line((-FILLET1_R * 0.02, -FILLET1_R), (-FILLET1_R * 0.02, FILLET1_R * 0.02))
            Line((-FILLET1_R * 0.02, FILLET1_R * 0.02), (FILLET1_R, FILLET1_R * 0.02))
            Line((FILLET1_R, FILLET1_R * 0.02), (FILLET1_R, 0))
        make_face()
    fillet1_piece_17b = extrude(amount=18.375, mode=Mode.PRIVATE)
    fillet1_piece_17b = split(fillet1_piece_17b, bisect_by=Plane(origin=(45.39619145, 45.180339887, 7.60380855), z_dir=(0, 1, 0)), keep=Keep.TOP, mode=Mode.PRIVATE)
    fillet1_piece_17 = fillet1_piece_17a & fillet1_piece_17b
    add(fillet1_piece_17, mode=Mode.SUBTRACT)

    # Sketch3 → Cut-Extrude1 (cut, up to next)
    with BuildSketch(Plane.XZ.offset(2), mode=Mode.PRIVATE) as cut_extrude1_sk1:
        with Locations((35, 6)):
            Rectangle(SKETCH3_W, SKETCH3_H)
    cut_extrude1_tool1 = extrude(cut_extrude1_sk1.sketch, amount=-CUT_EXTRUDE1_REACH, mode=Mode.PRIVATE) & part.part
    add(cut_extrude1_tool1.solids().sort_by_distance((35, -2, 6))[0], mode=Mode.SUBTRACT)


solid = part.part
